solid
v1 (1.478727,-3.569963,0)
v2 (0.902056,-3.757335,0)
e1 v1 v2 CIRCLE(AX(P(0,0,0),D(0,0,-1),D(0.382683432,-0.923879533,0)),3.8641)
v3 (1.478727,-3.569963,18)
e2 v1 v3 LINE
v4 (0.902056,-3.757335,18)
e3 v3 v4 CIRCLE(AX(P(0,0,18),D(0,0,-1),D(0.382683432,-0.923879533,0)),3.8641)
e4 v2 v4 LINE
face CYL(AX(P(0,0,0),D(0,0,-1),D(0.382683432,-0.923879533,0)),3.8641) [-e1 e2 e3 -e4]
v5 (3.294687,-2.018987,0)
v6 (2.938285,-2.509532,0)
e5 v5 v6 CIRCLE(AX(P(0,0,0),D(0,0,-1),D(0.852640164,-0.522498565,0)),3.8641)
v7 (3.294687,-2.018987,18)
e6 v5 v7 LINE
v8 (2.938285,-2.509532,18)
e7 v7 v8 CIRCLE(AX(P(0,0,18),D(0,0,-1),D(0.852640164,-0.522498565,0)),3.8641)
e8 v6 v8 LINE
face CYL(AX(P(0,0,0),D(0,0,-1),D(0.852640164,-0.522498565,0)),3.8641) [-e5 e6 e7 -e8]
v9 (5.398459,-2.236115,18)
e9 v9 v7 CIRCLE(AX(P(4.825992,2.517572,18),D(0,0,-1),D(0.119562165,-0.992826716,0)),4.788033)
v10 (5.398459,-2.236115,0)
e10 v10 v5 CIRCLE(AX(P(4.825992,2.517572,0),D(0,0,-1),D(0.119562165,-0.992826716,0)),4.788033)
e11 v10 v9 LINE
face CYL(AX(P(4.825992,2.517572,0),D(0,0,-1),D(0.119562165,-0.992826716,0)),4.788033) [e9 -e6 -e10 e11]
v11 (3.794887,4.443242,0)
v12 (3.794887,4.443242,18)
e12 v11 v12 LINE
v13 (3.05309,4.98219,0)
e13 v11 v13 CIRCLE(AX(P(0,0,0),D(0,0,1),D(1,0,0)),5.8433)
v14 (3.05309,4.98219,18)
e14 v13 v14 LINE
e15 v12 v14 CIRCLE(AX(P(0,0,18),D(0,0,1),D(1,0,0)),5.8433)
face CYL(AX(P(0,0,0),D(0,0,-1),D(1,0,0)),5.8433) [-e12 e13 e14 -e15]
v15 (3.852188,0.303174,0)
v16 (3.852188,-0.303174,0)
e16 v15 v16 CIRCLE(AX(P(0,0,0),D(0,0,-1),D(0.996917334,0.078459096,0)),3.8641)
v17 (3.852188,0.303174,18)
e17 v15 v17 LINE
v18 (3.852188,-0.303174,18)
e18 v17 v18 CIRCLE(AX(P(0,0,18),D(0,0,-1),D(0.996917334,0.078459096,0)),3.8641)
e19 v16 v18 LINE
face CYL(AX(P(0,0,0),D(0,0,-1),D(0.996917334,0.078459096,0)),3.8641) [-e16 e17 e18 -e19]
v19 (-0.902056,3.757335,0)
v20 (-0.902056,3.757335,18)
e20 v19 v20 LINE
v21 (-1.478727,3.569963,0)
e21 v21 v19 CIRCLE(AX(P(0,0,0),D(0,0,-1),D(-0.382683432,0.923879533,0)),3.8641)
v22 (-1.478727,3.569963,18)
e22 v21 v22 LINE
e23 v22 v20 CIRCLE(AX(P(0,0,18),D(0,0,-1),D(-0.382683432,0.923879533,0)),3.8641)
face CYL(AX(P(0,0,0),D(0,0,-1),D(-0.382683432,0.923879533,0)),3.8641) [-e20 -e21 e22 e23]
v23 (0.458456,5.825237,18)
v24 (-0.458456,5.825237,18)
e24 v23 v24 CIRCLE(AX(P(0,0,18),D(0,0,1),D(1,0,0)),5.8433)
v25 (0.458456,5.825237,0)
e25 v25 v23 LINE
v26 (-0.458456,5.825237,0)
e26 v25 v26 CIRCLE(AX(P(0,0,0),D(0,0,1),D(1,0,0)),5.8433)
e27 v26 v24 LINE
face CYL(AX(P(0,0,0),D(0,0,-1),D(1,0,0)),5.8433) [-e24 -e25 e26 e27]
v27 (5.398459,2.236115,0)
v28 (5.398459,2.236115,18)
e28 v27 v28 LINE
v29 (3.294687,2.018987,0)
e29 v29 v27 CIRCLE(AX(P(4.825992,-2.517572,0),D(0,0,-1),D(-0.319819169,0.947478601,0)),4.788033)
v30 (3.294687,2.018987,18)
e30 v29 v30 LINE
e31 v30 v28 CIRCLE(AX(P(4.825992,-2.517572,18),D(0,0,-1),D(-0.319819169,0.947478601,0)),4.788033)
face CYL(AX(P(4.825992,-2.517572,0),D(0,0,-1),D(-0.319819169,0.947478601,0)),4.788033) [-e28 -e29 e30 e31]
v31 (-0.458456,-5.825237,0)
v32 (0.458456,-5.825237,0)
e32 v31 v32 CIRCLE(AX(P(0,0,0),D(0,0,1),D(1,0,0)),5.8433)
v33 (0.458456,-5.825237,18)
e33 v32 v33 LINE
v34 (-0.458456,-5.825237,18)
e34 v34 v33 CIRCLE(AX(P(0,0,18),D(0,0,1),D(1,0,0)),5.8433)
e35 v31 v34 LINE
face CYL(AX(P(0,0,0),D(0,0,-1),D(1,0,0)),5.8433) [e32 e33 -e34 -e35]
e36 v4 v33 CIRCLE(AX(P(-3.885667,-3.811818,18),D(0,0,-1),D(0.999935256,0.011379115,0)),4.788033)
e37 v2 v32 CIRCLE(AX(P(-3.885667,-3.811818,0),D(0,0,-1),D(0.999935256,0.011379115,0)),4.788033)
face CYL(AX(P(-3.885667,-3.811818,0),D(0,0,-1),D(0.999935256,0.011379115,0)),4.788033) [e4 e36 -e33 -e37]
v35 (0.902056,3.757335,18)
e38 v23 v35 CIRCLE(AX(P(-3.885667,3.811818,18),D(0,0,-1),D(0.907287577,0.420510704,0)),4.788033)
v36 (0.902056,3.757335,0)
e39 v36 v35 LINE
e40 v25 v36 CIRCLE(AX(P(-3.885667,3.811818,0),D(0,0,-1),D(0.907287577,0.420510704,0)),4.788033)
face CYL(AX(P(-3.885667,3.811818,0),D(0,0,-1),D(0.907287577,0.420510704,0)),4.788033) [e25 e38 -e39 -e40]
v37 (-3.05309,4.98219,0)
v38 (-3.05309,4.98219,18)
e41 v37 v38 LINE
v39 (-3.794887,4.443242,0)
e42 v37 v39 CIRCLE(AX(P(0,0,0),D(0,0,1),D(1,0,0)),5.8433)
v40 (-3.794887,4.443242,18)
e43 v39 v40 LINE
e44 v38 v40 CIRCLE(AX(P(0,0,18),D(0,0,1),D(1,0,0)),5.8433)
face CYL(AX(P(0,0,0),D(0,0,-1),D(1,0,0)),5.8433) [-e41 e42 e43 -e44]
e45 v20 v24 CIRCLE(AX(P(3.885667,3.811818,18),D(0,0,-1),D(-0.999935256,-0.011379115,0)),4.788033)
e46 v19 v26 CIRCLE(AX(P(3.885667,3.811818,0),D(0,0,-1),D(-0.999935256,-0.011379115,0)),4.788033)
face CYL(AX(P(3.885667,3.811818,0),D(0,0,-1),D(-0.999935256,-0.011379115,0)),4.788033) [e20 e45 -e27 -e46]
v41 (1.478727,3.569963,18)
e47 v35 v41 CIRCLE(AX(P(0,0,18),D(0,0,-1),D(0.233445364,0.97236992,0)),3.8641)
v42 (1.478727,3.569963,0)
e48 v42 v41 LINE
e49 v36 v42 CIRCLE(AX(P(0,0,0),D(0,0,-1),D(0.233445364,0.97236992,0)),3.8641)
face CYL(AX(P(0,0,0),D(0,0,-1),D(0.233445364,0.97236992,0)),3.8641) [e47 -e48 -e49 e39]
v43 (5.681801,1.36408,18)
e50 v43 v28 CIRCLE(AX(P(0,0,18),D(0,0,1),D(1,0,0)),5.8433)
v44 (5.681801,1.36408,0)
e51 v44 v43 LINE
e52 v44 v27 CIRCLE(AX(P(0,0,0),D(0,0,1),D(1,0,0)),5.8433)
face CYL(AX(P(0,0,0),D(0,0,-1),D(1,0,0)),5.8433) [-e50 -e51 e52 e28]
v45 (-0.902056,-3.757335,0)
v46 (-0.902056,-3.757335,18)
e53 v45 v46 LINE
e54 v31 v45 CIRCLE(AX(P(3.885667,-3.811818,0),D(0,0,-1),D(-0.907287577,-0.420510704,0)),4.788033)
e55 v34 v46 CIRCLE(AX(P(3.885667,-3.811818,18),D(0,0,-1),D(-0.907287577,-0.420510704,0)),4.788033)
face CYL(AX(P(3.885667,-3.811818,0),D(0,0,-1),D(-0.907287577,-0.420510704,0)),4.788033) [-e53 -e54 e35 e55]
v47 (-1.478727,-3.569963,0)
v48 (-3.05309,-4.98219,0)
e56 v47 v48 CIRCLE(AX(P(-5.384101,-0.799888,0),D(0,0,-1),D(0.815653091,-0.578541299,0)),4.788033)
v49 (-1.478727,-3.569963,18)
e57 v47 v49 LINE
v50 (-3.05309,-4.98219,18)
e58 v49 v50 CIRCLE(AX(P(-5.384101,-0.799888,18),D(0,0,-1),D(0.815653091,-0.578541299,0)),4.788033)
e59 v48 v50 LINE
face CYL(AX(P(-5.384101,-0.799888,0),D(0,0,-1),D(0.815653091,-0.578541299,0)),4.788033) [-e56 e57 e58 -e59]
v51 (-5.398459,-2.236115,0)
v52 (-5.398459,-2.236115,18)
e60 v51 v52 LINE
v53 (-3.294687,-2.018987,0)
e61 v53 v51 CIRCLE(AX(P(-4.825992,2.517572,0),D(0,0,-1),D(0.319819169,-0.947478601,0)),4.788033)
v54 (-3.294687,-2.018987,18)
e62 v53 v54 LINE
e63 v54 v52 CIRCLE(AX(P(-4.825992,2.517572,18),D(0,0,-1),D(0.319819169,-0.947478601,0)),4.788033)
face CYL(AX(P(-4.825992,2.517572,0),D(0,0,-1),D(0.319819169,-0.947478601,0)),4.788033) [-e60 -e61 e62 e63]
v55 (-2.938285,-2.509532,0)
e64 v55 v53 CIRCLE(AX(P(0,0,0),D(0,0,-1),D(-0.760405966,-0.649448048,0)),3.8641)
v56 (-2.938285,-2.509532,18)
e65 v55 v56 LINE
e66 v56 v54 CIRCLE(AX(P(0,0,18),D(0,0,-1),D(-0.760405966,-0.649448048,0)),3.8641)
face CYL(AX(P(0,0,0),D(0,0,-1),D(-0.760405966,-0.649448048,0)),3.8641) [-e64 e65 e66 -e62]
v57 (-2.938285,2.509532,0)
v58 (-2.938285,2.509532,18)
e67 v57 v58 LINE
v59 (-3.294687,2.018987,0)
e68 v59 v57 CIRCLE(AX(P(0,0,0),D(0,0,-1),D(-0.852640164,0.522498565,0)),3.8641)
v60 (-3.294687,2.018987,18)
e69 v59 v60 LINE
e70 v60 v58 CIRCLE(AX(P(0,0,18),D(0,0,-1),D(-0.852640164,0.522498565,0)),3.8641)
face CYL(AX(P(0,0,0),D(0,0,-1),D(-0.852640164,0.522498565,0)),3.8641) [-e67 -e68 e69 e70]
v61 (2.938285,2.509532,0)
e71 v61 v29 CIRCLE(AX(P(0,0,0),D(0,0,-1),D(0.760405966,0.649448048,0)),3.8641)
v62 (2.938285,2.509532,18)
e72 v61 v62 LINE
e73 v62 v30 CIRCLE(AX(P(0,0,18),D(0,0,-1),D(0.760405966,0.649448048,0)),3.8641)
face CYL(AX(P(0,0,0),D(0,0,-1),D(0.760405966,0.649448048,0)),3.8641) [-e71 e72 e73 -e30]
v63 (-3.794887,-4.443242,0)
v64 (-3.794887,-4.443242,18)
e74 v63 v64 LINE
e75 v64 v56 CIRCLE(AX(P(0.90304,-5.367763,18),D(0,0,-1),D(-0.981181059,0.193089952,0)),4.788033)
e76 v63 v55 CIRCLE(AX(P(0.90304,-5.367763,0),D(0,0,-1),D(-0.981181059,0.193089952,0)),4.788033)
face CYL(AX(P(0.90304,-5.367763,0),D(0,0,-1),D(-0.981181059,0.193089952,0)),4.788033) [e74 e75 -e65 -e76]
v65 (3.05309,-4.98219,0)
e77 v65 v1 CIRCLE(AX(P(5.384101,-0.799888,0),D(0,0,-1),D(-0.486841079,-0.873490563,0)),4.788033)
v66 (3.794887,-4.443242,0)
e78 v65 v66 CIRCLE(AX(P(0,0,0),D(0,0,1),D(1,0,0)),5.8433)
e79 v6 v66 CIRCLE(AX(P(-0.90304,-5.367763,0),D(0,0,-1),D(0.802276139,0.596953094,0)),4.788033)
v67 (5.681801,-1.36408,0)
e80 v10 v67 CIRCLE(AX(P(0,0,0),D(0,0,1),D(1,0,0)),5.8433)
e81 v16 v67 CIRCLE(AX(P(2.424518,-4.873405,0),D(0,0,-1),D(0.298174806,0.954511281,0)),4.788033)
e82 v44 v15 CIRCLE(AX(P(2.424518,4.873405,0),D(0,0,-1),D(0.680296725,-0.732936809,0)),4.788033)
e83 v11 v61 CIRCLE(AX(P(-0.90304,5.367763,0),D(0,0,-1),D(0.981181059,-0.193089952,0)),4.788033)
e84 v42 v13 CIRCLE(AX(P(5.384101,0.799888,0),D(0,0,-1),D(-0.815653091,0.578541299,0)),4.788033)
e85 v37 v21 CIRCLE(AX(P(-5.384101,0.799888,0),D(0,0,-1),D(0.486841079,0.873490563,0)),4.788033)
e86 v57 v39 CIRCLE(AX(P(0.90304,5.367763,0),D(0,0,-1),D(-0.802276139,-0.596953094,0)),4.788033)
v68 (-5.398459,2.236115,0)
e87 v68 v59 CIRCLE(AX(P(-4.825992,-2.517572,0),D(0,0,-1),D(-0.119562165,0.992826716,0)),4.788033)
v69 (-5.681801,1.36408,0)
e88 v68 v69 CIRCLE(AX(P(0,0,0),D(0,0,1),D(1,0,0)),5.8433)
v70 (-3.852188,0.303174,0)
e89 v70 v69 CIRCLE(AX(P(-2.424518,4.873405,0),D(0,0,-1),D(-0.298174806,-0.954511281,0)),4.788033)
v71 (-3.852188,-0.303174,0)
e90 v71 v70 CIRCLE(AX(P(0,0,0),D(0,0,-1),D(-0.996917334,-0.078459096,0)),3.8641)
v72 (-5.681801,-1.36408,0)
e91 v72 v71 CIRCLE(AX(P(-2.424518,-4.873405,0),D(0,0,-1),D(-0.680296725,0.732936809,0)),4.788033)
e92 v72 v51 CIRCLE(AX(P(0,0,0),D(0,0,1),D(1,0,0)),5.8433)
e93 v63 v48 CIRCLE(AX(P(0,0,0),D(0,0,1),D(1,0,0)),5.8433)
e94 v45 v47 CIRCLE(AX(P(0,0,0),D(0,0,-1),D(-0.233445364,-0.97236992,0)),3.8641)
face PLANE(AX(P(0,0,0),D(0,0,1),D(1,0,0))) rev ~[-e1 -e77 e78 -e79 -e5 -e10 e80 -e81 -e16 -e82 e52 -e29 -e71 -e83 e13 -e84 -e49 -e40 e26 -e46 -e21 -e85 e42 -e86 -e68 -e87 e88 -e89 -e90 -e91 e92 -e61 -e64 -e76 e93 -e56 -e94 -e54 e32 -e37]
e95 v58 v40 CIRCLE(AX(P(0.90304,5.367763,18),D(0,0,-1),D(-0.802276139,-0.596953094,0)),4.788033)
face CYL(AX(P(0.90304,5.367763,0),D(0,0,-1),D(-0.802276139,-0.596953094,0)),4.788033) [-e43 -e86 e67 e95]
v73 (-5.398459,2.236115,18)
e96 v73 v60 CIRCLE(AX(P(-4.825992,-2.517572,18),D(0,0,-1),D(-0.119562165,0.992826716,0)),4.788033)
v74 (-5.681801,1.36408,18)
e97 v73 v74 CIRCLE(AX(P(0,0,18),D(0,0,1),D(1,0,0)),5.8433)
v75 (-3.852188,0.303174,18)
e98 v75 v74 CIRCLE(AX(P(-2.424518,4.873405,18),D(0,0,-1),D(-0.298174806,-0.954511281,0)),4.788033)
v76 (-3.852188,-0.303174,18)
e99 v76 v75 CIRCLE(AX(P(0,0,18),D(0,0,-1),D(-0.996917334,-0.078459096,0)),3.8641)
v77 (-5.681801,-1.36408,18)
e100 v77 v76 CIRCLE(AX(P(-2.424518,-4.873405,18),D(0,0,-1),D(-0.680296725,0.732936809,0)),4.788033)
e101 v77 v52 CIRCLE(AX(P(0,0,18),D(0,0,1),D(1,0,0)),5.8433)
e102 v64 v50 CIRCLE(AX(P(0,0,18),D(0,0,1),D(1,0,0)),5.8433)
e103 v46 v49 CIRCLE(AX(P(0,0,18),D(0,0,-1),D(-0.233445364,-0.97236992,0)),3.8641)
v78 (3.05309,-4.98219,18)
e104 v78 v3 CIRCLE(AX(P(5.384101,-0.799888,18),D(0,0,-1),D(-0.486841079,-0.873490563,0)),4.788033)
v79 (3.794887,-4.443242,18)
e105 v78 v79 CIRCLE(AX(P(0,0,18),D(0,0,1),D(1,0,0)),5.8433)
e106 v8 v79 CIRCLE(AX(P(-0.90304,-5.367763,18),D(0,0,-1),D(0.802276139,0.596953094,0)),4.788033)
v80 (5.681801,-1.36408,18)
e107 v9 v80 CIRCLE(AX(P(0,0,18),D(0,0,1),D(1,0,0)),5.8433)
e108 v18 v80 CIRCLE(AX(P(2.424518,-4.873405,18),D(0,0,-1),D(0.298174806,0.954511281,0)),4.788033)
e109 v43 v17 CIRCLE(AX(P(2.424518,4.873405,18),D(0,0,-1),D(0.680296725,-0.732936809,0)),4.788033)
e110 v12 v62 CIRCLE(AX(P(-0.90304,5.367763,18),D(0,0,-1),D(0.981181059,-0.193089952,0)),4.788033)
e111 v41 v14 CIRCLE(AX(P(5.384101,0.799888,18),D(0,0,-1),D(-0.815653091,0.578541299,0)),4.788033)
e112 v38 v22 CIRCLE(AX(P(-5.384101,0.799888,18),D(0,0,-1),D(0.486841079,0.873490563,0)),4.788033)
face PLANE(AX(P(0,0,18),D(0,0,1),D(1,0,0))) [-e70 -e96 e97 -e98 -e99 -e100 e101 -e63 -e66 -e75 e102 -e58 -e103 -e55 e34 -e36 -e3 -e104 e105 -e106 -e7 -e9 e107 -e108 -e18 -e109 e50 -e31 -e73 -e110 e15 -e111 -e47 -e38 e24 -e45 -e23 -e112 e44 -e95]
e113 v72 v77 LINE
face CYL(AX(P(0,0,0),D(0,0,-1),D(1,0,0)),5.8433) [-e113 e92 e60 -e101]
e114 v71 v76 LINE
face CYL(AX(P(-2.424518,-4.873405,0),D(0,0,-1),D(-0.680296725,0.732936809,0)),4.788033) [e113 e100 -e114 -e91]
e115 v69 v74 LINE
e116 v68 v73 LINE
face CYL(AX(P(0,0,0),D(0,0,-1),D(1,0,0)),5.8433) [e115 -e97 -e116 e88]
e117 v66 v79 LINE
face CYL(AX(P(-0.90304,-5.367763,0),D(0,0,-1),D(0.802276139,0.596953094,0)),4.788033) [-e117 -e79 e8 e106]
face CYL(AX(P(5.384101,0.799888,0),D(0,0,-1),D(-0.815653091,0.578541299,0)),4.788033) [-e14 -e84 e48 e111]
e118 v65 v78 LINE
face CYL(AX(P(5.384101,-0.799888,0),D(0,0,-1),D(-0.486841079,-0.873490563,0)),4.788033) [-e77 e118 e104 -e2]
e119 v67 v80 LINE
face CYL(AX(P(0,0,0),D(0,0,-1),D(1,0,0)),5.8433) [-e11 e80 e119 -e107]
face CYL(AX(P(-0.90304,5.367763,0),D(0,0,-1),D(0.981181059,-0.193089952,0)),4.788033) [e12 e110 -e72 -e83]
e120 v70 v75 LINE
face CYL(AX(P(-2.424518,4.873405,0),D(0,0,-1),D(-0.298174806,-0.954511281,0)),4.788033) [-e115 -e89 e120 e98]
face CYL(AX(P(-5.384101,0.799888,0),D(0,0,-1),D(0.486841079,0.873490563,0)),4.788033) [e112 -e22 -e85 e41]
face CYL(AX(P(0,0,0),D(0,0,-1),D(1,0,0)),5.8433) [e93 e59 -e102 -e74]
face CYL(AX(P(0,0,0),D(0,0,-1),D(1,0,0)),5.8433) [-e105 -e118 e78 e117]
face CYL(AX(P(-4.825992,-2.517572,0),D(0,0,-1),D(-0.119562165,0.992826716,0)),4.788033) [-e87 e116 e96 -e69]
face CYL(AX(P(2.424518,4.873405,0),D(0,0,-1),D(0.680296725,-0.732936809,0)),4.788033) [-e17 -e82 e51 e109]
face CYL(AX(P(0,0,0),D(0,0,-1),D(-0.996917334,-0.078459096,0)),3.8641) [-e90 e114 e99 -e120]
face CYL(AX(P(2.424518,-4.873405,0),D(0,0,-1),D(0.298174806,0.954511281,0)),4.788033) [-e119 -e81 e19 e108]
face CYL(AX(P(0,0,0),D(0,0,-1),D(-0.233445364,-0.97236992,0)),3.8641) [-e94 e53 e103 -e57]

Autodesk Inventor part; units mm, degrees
sketch "Sketch1" plane through (0, 0, 0) normal (0, 0, 1) x (1, 0, 0)
  circle A0 centre (0, 0) radius 5.8433
  dimension "d0" = 11.6865
extrude "Extrusion1" add sketch "Sketch1" along normal blind 18
ref_plane "Work Plane2" through (0, 0, 9) normal (0, 0, 1) x (1, 0, 0)
sketch "Sketch2" plane through (0, 0, 0) normal (0, 0, -1) x (-1, 0, 0)
  circle A0 centre (0, 0) radius 5.8433 projected
  circle A1 centre (0, 0) radius 5
  dimension "d3" = 10
surface extrude "Pitch Diameter" sketch "Sketch2" against normal through all shown no curves A1
ref_plane "Work Plane8" through (0, 0, 0) normal (0.9510565, 0.309017, 0) x (0, 0, 1)
ref_plane "Work Plane9" through (0, 0, 0) normal (1, 0, 0) x (0, 1, 0)
spur gear teeth "Spur Gear" teeth 10 pitch diameter 10 tip diameter 11.6865 root diameter 7.7282 face width 18 start plane through (0, 0, 0) normal (0, 0, -1) x (-1, 0, 0)
equation "\"d0\" = da_da"
equation "\"d1\" = da_b"
equation "\"d3\" = da_d"
equation "\"d16\" = da_aw"
equation "\"d43\" = da_aw"
equation "\"d46\" = da_aw"
equation "\"da_da\" = 11.686539"
equation "\"da_b\" = 18"
equation "\"da_d\" = 10"
equation "\"da_aw\" = 11.7"
properties part number "rs390_gear" material "Steel"
